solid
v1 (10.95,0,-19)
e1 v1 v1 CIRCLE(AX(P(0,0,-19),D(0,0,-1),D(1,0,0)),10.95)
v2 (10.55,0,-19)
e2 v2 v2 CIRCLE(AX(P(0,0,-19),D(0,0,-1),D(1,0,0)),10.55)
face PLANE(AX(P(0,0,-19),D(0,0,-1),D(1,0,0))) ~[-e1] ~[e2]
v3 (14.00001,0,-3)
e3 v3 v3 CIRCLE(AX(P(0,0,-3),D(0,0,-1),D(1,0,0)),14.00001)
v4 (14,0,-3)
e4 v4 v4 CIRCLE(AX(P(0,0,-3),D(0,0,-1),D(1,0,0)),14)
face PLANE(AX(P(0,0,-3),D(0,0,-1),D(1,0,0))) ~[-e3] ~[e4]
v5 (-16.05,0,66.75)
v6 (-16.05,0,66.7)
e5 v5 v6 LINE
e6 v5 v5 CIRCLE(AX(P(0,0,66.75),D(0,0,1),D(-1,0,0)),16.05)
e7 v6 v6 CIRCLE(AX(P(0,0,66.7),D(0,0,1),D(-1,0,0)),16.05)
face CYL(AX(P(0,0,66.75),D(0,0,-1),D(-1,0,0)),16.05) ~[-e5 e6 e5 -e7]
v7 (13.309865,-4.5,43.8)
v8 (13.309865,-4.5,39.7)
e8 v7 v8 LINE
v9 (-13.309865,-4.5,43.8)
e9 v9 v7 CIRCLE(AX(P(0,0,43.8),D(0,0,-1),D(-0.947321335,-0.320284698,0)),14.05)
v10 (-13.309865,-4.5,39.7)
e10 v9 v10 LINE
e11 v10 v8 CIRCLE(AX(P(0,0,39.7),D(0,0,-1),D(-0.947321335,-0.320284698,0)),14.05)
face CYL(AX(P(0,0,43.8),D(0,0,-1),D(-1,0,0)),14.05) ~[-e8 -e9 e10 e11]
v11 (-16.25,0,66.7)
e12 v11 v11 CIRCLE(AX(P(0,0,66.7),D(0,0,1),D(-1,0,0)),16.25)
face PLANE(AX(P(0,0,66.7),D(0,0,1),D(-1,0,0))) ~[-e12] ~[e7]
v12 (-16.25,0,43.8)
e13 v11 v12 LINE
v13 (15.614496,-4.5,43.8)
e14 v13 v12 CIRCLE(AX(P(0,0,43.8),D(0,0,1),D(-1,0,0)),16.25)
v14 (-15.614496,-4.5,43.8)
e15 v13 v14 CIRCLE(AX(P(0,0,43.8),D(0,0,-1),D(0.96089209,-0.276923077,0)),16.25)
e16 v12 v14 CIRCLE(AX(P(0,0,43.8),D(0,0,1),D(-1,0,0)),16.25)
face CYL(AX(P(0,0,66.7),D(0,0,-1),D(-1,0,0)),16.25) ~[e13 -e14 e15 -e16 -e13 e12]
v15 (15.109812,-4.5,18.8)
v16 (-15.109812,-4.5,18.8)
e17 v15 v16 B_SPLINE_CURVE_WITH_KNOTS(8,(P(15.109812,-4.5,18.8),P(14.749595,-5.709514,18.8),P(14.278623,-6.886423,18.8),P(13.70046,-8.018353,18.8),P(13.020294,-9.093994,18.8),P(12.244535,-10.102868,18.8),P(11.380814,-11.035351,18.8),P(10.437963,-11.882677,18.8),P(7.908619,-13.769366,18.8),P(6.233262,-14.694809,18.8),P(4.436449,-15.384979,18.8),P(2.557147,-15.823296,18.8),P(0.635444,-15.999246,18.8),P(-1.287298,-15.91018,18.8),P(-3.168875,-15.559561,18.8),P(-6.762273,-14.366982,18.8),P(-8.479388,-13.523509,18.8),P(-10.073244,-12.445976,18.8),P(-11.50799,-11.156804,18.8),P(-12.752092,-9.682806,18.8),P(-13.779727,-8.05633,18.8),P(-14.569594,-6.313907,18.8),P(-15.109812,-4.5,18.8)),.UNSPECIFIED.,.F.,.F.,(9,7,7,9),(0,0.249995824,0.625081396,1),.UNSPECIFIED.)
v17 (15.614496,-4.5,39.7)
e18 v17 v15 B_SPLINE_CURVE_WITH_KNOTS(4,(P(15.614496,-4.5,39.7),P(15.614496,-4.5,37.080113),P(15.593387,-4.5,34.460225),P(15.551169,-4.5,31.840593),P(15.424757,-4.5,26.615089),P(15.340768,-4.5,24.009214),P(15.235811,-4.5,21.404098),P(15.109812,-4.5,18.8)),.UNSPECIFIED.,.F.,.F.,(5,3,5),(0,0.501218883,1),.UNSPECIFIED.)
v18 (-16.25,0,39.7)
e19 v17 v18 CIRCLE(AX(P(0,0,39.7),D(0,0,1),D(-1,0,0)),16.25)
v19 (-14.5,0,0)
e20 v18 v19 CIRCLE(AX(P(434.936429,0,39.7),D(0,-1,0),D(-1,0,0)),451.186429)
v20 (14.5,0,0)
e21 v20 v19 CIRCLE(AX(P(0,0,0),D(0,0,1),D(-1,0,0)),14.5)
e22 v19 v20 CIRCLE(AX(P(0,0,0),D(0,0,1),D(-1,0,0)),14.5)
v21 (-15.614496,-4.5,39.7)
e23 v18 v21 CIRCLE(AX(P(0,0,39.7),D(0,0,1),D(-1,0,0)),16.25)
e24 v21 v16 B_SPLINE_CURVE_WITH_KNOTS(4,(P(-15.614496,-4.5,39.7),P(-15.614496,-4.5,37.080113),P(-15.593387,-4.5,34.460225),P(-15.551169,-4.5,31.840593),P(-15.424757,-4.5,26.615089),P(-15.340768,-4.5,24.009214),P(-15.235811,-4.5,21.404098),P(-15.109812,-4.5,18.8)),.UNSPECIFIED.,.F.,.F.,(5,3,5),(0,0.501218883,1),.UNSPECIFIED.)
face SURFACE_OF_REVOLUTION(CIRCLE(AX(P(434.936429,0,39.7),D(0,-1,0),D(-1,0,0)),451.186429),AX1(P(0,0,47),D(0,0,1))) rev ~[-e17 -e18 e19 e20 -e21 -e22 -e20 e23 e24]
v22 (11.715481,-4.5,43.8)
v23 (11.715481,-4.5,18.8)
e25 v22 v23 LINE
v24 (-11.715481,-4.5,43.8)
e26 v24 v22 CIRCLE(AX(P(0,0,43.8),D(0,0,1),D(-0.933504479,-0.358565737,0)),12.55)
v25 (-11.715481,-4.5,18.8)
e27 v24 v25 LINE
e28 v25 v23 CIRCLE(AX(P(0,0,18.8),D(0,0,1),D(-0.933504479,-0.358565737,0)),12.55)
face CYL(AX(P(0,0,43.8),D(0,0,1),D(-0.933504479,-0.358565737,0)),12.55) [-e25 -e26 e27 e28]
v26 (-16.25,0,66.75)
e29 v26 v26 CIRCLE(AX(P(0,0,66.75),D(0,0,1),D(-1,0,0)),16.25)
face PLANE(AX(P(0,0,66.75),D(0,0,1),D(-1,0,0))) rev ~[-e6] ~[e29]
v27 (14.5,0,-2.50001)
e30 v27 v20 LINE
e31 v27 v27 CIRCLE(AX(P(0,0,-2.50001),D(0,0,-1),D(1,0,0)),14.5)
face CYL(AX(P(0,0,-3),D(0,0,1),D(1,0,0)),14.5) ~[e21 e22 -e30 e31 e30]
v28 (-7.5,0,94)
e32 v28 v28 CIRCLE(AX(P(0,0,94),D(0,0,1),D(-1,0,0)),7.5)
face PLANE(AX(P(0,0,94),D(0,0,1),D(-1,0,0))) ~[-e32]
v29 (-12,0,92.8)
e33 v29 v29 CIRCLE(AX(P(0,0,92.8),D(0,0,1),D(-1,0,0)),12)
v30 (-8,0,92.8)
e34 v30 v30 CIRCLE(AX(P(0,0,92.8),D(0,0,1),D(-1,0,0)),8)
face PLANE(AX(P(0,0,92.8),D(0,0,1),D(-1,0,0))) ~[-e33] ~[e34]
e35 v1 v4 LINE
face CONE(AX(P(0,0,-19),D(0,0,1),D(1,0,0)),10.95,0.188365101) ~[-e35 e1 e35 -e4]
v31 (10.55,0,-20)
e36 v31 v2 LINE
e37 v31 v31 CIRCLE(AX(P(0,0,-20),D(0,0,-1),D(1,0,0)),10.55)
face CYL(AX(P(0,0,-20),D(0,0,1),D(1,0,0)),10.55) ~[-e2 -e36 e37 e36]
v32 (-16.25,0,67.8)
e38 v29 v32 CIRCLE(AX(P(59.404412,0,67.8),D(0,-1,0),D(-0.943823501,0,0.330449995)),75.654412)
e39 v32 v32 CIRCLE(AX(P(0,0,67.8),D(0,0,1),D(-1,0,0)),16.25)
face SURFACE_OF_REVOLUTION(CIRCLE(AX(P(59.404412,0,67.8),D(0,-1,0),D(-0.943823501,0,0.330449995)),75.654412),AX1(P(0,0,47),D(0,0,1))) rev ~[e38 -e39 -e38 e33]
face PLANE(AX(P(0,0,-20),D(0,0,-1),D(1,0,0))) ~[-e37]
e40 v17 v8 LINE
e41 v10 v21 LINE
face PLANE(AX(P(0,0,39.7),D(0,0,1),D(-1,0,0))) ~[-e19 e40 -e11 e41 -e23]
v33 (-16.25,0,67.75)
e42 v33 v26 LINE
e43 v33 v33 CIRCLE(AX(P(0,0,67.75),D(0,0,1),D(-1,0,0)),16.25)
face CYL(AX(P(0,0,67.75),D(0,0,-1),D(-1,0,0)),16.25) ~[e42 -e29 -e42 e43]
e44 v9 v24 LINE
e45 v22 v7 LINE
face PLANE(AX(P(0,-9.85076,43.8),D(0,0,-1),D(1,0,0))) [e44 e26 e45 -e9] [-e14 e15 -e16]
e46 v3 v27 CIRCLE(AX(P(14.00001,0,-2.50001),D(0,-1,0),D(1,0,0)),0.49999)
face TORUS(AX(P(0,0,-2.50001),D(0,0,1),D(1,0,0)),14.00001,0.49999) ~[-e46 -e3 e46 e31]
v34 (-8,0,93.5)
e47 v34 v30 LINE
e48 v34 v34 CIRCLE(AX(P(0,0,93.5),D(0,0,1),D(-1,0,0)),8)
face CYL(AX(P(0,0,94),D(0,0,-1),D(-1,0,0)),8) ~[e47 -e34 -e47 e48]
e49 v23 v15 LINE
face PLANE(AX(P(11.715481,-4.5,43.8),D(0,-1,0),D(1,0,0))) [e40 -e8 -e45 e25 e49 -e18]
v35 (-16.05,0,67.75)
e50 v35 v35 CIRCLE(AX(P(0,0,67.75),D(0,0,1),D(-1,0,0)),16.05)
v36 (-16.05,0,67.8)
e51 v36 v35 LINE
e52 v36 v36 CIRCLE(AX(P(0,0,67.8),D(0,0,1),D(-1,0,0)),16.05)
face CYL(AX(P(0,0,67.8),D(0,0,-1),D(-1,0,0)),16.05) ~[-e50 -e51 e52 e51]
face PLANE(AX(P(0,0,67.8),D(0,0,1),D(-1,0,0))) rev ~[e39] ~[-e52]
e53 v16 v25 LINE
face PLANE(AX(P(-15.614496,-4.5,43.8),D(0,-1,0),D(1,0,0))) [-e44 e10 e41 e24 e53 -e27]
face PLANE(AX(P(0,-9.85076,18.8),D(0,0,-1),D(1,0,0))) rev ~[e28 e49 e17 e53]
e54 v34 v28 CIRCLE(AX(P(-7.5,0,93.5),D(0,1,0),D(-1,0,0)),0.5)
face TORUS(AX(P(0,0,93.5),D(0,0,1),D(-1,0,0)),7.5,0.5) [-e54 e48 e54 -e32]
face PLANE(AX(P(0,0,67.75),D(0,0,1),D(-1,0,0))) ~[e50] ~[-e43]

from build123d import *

# Parameters (mm, degrees)
F3_DEPTH = 25
F4_R     = 0.5
F7_R     = 0.49999


# Not quite as in the source:
# - a fillet or chamfer is up to 0.001 mm smaller than in the source, because OpenCascade refuses the exact size


with BuildPart() as f1:
    # F0 (on Front) → F1 (revolve)
    with BuildSketch(Plane.XZ):
        with BuildLine():
            Line((-14.5, 0), (0, 0))
            Line((0, 0), (0, 94))
            Line((0, 94), (-8, 94))
            Line((-8, 94), (-8, 92.8))
            Line((-8, 92.8), (-12, 92.8))
            ThreePointArc((-12, 92.8), (-15.1799323999, 80.479338508), (-16.25, 67.8))
            Line((-16.25, 67.8), (-16.05, 67.8))
            Line((-16.05, 67.8), (-16.05, 67.75))
            Line((-16.05, 67.75), (-16.25, 67.75))
            Line((-16.25, 67.75), (-16.25, 66.75))
            Line((-16.25, 66.75), (-16.05, 66.75))
            Line((-16.05, 66.75), (-16.05, 66.7))
            Line((-16.05, 66.7), (-16.25, 66.7))
            Line((-16.25, 66.7), (-16.25, 43.8))
            Line((-16.25, 43.8), (-14.05, 43.8))
            Line((-14.05, 43.8), (-14.05, 39.7))
            Line((-14.05, 39.7), (-16.25, 39.7))
            ThreePointArc((-16.25, 39.7), (-15.8122876797, 19.8307240947), (-14.5, 0))
        make_face()
    revolve(axis=Axis((0, 0, 47), (0, 0, 1)))

    # F2 (on face) → F3 (cut)
    with BuildSketch(Plane(origin=(0, 0, 43.8), x_dir=(1, 0, 0), z_dir=(0, 0, -1))):
        with BuildLine():
            Line((11.7154812108, 4.5), (15.6144964696, 4.5))
            ThreePointArc((15.6144964696, 4.5), (0, 16.25), (-15.6144964696, 4.5))
            Line((-15.6144964696, 4.5), (-11.7154812108, 4.5))
            ThreePointArc((-11.7154812108, 4.5), (0, 12.55), (11.7154812108, 4.5))
        make_face()
    extrude(amount=F3_DEPTH, mode=Mode.SUBTRACT)

    # F4
    f4_edges = [f1.edges().sort_by_distance(p)[0] for p in [
        (8, 0, 94),
    ]]
    fillet(f4_edges, radius=F4_R)

    # F5 (on Front) → F6 (revolve)
    with BuildSketch(Plane.XZ):
        Polygon((14.5, 0), (0, 0), (0, -20), (10.55, -20), (10.55, -19), (10.95, -19), (14, -3), (14.5, -3), align=None)
    revolve(axis=Axis((0, 0, -10), (0, 0, -1)))

    # F7 (radius 0.5 in the source; OpenCascade refuses exactly that, so slightly less here)
    f7_edges = [f1.edges().sort_by_distance(p)[0] for p in [
        (-14.5, 0, -3),
    ]]
    fillet(f7_edges, radius=F7_R)


solid = f1.part
